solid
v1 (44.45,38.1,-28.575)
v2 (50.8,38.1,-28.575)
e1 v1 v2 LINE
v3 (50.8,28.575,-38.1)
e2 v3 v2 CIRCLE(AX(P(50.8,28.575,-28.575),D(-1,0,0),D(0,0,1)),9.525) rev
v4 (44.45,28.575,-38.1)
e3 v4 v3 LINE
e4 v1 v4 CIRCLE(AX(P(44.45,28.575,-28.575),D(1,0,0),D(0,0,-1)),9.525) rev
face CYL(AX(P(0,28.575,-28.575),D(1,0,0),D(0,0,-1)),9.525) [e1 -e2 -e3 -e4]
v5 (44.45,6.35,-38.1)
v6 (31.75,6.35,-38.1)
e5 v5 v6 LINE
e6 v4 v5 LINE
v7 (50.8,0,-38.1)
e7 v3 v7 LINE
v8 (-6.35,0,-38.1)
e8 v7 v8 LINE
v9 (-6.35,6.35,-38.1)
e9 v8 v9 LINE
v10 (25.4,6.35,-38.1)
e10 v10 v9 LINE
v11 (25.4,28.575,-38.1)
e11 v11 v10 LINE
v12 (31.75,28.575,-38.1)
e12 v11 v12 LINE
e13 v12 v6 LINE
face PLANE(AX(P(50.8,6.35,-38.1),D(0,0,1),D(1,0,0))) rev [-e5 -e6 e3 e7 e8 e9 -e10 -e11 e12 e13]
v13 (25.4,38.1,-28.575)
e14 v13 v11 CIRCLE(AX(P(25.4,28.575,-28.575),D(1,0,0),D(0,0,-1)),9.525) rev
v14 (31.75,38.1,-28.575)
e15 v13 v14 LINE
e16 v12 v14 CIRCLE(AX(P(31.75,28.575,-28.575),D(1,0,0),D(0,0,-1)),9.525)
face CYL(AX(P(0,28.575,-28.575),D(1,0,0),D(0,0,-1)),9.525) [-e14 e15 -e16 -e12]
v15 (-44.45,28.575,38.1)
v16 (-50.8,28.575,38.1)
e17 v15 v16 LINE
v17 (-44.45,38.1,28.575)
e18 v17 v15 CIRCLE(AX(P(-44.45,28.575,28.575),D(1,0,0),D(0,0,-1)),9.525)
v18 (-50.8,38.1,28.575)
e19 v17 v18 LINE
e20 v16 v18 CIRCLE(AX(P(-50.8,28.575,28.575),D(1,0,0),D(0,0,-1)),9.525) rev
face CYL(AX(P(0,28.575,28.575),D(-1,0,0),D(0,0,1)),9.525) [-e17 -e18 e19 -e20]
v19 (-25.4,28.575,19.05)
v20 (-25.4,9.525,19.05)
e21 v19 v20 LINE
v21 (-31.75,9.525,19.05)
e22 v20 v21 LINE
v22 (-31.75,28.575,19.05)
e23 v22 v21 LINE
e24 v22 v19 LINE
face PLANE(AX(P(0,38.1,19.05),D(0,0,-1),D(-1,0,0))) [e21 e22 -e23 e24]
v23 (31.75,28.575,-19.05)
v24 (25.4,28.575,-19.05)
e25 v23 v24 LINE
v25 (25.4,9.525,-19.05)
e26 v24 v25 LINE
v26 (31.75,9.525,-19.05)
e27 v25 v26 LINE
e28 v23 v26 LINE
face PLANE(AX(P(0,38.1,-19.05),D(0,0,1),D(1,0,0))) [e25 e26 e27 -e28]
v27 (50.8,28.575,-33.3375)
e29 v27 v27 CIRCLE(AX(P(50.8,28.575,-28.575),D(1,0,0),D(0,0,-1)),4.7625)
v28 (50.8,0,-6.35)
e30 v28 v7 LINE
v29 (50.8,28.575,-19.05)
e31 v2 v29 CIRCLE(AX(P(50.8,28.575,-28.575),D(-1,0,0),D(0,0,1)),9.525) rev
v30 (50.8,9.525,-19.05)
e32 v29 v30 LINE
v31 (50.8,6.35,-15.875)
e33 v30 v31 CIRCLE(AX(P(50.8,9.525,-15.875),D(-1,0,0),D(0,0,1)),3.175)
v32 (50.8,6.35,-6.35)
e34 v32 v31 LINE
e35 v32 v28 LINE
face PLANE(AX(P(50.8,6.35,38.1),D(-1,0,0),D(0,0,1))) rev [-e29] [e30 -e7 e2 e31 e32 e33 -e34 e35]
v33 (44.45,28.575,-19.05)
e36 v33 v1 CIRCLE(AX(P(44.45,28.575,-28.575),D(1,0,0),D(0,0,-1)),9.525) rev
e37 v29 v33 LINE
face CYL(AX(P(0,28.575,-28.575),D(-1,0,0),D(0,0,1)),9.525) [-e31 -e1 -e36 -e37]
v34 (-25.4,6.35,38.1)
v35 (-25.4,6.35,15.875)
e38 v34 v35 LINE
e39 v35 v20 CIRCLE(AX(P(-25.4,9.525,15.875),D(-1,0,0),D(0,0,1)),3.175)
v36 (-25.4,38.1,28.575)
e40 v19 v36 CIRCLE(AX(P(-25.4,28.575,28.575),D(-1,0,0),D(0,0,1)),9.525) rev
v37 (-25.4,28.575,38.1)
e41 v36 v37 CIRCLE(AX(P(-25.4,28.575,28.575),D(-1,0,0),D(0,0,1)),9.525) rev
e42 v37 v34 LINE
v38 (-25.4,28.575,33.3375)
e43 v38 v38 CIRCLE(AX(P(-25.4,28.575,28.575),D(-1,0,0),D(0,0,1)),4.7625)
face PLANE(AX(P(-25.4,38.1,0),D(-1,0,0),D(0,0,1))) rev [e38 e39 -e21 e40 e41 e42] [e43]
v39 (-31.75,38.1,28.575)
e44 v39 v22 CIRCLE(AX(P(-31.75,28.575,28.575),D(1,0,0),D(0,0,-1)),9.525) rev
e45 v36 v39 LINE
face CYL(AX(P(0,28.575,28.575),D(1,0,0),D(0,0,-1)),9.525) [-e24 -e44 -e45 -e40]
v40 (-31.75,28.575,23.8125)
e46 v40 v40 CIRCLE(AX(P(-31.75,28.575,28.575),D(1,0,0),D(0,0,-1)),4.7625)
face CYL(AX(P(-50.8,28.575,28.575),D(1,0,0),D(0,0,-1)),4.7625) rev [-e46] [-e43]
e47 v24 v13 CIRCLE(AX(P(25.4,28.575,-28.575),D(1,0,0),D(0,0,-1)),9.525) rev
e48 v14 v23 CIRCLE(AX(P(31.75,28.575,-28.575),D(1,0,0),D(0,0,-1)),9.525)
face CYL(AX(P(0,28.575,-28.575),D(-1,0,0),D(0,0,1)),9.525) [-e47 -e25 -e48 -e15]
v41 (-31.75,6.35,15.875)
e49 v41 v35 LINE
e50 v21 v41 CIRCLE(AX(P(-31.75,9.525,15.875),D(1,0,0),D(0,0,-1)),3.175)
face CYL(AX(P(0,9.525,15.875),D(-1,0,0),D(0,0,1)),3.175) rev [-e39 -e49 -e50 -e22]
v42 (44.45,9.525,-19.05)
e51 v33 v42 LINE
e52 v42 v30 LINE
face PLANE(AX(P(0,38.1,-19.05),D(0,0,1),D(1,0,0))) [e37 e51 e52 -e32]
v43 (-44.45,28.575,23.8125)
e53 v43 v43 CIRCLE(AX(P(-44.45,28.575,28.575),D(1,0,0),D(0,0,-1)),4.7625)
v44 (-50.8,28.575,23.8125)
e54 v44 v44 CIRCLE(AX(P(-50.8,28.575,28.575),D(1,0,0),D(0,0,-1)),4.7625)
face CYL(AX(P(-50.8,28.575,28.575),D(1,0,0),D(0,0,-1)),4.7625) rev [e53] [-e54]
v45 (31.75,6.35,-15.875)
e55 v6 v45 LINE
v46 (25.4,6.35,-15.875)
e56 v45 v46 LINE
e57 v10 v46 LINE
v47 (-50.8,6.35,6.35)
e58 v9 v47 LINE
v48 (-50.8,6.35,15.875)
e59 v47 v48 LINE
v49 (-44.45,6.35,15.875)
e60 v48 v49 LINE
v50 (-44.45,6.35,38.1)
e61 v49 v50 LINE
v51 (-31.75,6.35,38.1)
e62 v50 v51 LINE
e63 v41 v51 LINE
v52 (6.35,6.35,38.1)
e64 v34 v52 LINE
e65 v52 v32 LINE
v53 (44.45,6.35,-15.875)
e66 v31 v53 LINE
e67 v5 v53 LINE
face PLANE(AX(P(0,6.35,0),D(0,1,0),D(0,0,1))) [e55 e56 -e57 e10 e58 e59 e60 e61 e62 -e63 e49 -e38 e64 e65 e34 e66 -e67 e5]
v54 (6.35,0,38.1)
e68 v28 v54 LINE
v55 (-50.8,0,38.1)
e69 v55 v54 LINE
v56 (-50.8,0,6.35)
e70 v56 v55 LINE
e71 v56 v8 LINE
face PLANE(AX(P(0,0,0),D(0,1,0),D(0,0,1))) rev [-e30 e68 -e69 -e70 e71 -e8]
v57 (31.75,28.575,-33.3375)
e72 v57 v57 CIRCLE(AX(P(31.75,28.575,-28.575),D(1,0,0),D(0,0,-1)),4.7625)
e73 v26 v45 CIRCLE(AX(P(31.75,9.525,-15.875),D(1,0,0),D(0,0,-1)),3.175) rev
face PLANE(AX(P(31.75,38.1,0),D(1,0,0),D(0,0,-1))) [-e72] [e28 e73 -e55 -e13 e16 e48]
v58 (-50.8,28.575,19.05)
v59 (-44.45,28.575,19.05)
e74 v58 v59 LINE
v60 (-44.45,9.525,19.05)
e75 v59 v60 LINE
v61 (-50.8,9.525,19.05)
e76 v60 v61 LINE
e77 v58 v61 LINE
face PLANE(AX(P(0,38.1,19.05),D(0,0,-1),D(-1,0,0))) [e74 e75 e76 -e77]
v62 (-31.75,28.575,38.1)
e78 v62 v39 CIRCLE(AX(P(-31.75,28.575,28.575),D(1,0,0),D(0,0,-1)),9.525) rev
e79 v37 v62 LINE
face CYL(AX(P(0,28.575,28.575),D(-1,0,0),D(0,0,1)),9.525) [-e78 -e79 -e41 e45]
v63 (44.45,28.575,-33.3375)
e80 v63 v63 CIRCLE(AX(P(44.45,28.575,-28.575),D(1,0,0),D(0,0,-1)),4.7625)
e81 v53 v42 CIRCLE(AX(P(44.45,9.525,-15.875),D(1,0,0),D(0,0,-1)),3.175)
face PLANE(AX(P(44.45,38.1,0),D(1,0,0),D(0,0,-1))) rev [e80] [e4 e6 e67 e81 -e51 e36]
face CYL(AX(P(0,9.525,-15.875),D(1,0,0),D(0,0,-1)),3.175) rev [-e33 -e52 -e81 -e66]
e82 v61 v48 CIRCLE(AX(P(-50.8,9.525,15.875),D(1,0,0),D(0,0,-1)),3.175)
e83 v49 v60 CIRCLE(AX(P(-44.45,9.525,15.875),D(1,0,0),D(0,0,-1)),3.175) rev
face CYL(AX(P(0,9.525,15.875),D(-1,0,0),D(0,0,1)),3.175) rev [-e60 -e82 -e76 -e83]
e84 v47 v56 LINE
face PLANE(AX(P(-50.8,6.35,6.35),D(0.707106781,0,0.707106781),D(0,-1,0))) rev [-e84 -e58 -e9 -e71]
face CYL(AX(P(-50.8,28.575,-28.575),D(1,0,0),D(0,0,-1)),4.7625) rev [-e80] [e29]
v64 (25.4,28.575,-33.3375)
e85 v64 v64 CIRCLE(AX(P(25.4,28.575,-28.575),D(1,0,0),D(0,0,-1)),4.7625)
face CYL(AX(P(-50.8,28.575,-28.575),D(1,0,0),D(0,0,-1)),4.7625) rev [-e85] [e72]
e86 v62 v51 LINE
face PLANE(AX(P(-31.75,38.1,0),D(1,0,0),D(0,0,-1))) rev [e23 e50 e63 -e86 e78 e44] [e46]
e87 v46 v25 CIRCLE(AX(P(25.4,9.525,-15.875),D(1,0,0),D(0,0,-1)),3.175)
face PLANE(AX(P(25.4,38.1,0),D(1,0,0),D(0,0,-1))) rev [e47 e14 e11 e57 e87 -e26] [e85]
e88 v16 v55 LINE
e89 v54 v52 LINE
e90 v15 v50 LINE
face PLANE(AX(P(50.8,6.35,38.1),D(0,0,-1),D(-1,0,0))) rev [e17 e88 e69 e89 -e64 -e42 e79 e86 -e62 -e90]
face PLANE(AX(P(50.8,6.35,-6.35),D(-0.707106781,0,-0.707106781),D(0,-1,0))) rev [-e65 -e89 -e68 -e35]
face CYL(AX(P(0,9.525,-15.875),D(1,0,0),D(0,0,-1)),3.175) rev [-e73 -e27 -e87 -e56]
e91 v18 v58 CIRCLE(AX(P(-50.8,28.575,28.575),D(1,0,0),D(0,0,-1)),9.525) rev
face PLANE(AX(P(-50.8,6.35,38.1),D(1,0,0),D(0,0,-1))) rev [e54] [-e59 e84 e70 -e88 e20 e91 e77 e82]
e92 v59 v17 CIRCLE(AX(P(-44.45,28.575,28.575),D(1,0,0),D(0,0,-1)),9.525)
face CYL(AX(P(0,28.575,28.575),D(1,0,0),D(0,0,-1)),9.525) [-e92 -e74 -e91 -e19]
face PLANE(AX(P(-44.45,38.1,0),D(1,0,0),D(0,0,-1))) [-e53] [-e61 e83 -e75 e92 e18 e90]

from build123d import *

# Parameters (mm, degrees)
SKETCH1_W           = 101.6
SKETCH1_H           = 76.2
BOSS_EXTRUDE1_DEPTH = 6.35
SKETCH2_W           = 6.35
SKETCH2_H           = 19.05
BOSS_EXTRUDE2_DEPTH = 31.75
SKETCH3_R           = 4.7625
CUT_EXTRUDE1_DEPTH  = 116.003391254
FILLET1_R           = 3.175
FILLET2_R           = 9.525
CHAMFER1_SIZE       = 44.45


with BuildPart() as part:
    # Sketch1 → Boss-Extrude1 (new body)
    with BuildSketch(Plane(origin=(0, 0, 0), x_dir=(1, 0, 0), z_dir=(0, 1, 0))):
        Rectangle(SKETCH1_W, SKETCH1_H)
    extrude(amount=BOSS_EXTRUDE1_DEPTH)

    # Sketch2 → Boss-Extrude2 (add)
    with BuildSketch(Plane(origin=(0, 6.35, 0), x_dir=(1, 0, 0), z_dir=(0, 1, 0))):
        with Locations((-47.625, -28.575)):
            Rectangle(SKETCH2_W, SKETCH2_H)
        with Locations((-28.575, -28.575)):
            Rectangle(SKETCH2_W, SKETCH2_H)
        with Locations((28.575, 28.575)):
            Rectangle(SKETCH2_W, SKETCH2_H)
        with Locations((47.625, 28.575)):
            Rectangle(SKETCH2_W, SKETCH2_H)
    extrude(amount=BOSS_EXTRUDE2_DEPTH)

    # Sketch3 → Cut-Extrude1 (cut, through all)
    with BuildSketch(Plane(origin=(50.8, 0, 0), x_dir=(0, 0, -1), z_dir=(1, 0, 0))):
        with Locations((28.575, 28.575)):
            Circle(SKETCH3_R)
        with Locations((-28.575, 28.575)):
            Circle(SKETCH3_R)
    extrude(amount=-CUT_EXTRUDE1_DEPTH, mode=Mode.SUBTRACT)

    # Fillet1
    fillet1_edges = [part.edges().sort_by_distance(p)[0] for p in [
        (-47.625, 6.35, 19.05),
        (-28.575, 6.35, 19.05),
        (28.575, 6.35, -19.05),
        (47.625, 6.35, -19.05),
    ]]
    fillet(fillet1_edges, radius=FILLET1_R)

    # Fillet2
    fillet2_edges = [part.edges().sort_by_distance(p)[0] for p in [
        (28.575, 38.1, -38.1),
        (47.625, 38.1, -38.1),
        (-47.625, 38.1, 19.05),
        (-47.625, 38.1, 38.1),
        (-28.575, 38.1, 19.05),
        (-28.575, 38.1, 38.1),
        (28.575, 38.1, -19.05),
        (47.625, 38.1, -19.05),
    ]]
    fillet(fillet2_edges, radius=FILLET2_R - 0.0001)  # a hair under: the kernel refuses the full size

    # Chamfer1
    chamfer1_edges = [part.edges().sort_by_distance(p)[0] for p in [
        (-50.8, 3.175, -38.1),
        (50.8, 3.175, 38.1),
    ]]
    chamfer(chamfer1_edges, length=CHAMFER1_SIZE)


solid = part.part
